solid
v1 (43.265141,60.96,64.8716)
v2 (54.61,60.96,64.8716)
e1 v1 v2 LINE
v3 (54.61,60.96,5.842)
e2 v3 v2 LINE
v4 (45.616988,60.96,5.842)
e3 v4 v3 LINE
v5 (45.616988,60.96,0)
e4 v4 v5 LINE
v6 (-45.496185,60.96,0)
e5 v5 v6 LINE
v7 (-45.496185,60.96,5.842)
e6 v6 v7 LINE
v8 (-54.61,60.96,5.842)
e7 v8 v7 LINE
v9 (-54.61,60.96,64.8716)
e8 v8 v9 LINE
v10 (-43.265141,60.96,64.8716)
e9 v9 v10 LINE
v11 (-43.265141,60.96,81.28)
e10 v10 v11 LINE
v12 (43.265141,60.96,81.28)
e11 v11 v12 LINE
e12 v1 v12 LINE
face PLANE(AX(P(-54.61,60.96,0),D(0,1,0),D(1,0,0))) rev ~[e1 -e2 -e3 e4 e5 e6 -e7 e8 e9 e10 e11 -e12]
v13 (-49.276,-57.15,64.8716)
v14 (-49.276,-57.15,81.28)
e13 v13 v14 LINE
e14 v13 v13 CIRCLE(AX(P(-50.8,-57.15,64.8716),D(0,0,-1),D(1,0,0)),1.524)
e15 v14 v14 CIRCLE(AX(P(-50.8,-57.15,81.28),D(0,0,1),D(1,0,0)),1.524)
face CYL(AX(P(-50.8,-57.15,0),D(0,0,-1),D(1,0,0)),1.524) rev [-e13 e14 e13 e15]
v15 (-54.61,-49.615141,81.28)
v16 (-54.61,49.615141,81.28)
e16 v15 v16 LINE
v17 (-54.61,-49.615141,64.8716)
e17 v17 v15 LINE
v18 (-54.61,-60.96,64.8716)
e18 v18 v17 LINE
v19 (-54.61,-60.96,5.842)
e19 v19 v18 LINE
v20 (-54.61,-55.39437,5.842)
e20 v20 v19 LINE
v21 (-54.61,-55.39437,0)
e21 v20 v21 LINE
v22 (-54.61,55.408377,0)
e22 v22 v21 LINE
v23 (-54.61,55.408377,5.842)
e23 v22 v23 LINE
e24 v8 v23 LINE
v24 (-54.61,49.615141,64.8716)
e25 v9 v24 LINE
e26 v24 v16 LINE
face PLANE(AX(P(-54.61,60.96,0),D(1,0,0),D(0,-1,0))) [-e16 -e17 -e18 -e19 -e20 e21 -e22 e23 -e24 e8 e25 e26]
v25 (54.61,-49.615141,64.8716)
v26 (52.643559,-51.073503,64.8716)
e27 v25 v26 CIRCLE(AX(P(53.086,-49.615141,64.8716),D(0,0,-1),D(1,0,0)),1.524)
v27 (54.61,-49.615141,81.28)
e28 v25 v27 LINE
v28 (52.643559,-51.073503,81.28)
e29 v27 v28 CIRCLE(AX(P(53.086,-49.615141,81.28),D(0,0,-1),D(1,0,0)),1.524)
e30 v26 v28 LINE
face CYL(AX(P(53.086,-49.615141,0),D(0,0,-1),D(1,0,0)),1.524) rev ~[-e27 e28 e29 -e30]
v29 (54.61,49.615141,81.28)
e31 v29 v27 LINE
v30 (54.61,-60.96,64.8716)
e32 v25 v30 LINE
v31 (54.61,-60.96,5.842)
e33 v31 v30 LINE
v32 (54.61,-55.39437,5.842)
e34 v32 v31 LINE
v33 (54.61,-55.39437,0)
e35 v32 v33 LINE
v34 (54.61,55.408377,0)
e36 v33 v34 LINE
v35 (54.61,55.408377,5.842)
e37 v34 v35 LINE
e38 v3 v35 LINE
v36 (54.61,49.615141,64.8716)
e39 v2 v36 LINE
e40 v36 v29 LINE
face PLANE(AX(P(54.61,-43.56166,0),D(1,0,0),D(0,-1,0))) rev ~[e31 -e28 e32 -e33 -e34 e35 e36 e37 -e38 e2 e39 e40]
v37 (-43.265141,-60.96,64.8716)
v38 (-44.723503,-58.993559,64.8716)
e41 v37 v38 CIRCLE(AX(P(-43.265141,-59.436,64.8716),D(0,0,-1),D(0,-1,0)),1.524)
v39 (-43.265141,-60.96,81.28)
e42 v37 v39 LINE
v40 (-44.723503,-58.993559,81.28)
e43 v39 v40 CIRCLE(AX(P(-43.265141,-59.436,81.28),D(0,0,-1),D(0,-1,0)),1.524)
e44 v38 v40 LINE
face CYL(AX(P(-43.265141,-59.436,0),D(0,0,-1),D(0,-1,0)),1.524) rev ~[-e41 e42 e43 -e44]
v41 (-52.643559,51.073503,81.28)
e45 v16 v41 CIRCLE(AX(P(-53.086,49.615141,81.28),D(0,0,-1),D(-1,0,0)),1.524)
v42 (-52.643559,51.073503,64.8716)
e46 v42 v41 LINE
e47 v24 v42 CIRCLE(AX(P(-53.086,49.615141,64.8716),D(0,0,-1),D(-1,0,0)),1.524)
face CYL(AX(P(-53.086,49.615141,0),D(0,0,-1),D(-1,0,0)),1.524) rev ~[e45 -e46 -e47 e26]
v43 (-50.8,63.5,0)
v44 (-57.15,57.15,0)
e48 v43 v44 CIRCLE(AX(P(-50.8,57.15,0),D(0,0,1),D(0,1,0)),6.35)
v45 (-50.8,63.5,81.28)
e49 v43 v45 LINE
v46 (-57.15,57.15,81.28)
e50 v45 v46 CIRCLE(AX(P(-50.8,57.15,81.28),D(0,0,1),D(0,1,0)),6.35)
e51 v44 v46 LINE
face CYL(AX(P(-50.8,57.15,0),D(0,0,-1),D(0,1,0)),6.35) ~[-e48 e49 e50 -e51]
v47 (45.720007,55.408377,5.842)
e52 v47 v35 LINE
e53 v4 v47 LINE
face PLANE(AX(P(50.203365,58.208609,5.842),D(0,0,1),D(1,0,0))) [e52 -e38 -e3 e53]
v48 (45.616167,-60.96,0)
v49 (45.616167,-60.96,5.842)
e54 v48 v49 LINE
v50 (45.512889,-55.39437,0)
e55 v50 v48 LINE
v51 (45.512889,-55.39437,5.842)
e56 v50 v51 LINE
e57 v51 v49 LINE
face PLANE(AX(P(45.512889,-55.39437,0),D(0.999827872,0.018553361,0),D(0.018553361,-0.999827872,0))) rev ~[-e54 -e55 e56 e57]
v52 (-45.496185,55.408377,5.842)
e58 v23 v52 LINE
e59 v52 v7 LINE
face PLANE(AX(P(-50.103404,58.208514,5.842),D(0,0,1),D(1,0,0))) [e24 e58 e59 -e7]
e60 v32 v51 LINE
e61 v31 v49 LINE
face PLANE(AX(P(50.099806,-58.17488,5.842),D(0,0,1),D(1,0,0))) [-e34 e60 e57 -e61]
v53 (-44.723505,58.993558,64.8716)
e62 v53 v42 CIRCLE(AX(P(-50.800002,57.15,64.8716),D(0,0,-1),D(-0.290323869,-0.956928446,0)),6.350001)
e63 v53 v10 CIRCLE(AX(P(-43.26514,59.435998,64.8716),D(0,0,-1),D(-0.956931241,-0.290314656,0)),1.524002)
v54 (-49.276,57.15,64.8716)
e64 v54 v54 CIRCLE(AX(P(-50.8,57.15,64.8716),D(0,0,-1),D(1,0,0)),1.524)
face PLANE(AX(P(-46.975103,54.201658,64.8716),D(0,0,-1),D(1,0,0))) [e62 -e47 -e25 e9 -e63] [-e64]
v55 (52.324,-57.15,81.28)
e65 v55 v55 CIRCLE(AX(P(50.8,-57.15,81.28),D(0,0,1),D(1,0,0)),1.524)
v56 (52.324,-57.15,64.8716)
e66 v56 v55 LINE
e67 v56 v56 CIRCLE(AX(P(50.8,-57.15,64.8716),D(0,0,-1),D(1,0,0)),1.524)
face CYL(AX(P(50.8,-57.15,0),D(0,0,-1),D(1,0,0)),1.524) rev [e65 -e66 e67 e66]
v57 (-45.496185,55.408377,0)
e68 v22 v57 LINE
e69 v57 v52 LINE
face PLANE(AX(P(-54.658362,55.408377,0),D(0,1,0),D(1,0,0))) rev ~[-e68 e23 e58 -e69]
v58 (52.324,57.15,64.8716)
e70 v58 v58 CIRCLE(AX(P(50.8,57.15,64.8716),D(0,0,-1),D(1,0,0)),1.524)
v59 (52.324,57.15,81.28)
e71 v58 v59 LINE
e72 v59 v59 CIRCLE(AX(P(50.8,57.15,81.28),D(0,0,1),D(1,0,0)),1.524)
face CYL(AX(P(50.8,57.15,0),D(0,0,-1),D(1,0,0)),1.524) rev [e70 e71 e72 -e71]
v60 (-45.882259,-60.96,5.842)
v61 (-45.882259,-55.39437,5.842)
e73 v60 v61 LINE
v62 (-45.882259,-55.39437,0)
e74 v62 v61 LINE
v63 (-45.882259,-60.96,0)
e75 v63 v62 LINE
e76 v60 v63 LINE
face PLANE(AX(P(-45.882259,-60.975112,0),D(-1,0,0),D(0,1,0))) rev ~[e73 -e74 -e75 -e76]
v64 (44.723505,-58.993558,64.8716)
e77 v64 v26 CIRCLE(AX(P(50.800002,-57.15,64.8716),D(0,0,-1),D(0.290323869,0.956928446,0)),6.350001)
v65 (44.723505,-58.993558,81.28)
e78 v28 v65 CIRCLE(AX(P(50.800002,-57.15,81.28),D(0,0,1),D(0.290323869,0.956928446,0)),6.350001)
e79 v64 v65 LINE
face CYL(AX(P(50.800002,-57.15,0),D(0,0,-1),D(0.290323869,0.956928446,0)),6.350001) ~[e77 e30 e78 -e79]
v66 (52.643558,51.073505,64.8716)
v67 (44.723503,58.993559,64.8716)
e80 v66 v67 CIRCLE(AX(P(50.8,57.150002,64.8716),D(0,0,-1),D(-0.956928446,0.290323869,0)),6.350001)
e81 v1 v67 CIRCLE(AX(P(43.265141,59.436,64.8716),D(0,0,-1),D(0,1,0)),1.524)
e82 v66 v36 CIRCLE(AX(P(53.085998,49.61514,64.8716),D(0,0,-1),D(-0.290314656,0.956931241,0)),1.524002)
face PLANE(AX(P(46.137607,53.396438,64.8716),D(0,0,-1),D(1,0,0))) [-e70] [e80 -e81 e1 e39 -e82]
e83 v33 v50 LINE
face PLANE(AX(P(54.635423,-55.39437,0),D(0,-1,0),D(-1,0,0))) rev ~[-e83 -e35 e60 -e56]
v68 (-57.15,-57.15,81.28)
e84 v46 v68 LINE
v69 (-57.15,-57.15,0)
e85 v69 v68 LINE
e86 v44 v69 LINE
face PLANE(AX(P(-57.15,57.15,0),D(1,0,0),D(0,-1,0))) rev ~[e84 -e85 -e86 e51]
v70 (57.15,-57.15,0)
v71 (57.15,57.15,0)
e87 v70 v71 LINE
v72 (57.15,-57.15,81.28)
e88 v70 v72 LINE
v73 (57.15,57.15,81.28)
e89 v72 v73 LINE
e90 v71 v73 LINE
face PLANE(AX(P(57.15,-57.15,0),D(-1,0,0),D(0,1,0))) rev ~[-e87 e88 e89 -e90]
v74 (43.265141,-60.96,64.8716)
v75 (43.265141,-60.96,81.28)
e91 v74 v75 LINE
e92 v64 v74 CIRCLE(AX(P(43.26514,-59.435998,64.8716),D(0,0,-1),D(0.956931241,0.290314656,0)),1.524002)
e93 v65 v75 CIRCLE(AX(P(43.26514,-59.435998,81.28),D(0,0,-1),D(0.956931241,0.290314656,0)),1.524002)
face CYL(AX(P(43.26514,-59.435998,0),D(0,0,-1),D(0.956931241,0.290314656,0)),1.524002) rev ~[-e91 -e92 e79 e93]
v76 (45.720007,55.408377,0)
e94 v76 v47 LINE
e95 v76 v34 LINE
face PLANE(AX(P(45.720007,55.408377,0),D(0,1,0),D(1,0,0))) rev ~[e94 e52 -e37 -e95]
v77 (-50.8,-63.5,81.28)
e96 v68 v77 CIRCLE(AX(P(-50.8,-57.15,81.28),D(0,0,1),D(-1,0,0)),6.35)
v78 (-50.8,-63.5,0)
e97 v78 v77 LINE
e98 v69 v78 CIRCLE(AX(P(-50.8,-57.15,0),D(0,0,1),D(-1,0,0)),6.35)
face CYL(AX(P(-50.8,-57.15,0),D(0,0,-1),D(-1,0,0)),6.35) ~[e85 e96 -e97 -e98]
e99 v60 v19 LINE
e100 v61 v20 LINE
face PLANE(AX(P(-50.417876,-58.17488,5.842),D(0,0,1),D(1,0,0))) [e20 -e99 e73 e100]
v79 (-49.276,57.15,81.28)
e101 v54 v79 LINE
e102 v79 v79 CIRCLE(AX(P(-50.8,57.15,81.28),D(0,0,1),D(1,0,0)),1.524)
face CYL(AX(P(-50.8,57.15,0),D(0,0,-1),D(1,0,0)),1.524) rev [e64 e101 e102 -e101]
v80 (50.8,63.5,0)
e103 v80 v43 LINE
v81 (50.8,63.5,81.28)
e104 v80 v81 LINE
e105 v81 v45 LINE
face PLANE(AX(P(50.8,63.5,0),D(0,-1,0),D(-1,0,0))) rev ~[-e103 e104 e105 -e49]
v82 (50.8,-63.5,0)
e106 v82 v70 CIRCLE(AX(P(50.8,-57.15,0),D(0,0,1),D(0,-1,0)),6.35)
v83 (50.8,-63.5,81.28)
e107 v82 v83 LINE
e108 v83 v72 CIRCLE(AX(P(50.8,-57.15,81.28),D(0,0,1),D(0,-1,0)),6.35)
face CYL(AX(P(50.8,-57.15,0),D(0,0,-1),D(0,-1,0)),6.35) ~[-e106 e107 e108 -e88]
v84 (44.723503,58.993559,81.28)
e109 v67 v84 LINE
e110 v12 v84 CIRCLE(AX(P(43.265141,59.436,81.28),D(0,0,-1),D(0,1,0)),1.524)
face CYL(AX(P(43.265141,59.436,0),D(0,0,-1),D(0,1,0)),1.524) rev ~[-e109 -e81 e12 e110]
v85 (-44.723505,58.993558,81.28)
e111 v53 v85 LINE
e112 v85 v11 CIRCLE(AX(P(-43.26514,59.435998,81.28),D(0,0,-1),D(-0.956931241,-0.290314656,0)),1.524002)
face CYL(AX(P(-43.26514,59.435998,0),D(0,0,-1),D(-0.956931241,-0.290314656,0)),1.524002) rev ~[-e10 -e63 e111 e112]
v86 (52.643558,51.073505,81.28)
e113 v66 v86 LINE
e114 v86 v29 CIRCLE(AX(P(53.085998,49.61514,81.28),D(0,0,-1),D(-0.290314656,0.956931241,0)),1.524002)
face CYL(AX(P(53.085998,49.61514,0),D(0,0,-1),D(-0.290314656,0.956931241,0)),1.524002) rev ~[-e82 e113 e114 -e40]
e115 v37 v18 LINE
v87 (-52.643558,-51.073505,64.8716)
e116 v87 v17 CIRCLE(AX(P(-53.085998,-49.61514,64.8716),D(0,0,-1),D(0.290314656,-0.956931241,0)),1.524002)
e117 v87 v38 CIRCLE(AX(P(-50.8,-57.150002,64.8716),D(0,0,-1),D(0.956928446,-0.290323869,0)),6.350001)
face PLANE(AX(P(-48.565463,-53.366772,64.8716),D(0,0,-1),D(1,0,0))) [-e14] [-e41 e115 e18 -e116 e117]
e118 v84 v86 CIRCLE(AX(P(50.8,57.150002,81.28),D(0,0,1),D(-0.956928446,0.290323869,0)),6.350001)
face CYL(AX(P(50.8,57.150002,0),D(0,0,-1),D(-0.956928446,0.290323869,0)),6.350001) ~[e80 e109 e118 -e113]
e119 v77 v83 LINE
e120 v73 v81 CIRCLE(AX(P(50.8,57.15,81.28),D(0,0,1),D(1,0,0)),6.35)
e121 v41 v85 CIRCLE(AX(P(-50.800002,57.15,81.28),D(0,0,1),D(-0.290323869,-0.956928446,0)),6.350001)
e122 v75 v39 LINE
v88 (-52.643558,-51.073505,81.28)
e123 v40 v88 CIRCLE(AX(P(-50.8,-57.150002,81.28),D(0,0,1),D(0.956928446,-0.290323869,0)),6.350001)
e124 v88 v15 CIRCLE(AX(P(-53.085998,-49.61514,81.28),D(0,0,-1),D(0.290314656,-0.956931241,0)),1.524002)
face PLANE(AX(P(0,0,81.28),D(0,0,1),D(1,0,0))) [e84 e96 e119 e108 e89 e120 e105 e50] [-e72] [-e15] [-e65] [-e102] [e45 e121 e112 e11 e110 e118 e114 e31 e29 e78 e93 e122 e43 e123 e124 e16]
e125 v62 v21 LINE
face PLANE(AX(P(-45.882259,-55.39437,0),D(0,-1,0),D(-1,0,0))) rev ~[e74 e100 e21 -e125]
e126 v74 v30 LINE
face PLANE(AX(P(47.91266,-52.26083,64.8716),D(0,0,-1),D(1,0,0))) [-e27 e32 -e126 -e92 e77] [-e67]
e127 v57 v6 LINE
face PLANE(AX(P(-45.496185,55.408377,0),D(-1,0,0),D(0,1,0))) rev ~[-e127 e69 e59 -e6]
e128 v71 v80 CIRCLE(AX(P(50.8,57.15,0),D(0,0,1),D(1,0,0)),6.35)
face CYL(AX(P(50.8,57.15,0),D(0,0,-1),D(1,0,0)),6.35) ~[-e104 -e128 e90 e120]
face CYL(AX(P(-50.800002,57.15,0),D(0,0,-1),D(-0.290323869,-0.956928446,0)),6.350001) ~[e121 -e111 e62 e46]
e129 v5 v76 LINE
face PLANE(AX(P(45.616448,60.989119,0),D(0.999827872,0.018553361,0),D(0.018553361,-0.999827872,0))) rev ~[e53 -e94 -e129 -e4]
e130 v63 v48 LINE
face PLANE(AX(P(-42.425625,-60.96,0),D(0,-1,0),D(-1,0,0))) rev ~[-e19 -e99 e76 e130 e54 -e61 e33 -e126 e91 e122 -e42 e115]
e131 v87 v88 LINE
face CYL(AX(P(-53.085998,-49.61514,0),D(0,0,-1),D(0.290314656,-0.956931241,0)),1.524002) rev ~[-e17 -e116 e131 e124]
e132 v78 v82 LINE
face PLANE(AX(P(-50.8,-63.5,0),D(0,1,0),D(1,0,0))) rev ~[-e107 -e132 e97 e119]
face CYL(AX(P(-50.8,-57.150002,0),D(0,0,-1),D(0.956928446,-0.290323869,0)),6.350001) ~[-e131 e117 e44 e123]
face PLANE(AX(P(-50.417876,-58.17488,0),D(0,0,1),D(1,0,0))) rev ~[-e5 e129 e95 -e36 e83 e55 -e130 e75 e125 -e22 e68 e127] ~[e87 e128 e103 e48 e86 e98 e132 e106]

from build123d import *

# Parameters (mm, degrees)
F0_R     = 1.524
F1_DEPTH = 81.28
F2_W     = 13.3946808136
F2_H     = 17.3983402467
F2_W_2   = 15.2697945094
F2_H_2   = 13.5166846132
F3_DEPTH = 64.8716
F5_DEPTH = 5.842


# Not quite as in the source:
# - ends of sketch curves that miss each other by under 0.0002 mm in the source are joined


with BuildPart() as f1:
    # F0 (on Top) → F1 (new body)
    with BuildSketch(Plane.XY):
        with BuildLine():
            Line((57.15, -57.15), (57.15, 57.15))
            ThreePointArc((57.15, 57.15), (55.2901280605, 61.6401280605), (50.8, 63.5))
            Line((50.8, 63.5), (-50.8, 63.5))
            ThreePointArc((-50.8, 63.5), (-55.2901280605, 61.6401280605), (-57.15, 57.15))
            Line((-57.15, 57.15), (-57.15, -57.15))
            ThreePointArc((-57.15, -57.15), (-55.2901280605, -61.6401280605), (-50.8, -63.5))
            Line((-50.8, -63.5), (50.8, -63.5))
            ThreePointArc((50.8, -63.5), (55.2901280605, -61.6401280605), (57.15, -57.15))
        make_face()
        with Locations((-50.8, -57.15)):
            Circle(F0_R, mode=Mode.SUBTRACT)
        with Locations((50.8, -57.15)):
            Circle(F0_R, mode=Mode.SUBTRACT)
        with Locations((-50.8, 57.15)):
            Circle(F0_R, mode=Mode.SUBTRACT)
        with BuildLine():
            Line((-43.2651408, 60.96), (43.2651408, 60.96))
            ThreePointArc((43.2651408, 60.96), (44.4892438959, 60.34382576), (44.7235034291, 58.993558544))
            ThreePointArc((44.7235034291, 58.993558544), (46.3098719395, 52.6598719395), (52.643558117, 51.0735048367))
            ThreePointArc((52.643558117, 51.0735048367), (53.99382576, 50.8392438959), (54.61, 49.6151408))
            Line((54.61, 49.6151408), (54.61, -49.6151408))
            ThreePointArc((54.61, -49.6151408), (53.99382576, -50.8392438959), (52.643558544, -51.0735034291))
            ThreePointArc((52.643558544, -51.0735034291), (46.3098719395, -52.6598719395), (44.7235048367, -58.993558117))
            ThreePointArc((44.7235048367, -58.993558117), (44.4892438959, -60.34382576), (43.2651408, -60.96))
            Line((43.2651408, -60.96), (-43.2651408, -60.96))
            ThreePointArc((-43.2651408, -60.96), (-44.4892438959, -60.34382576), (-44.7235034291, -58.993558544))
            ThreePointArc((-44.7235034291, -58.993558544), (-46.3098719395, -52.6598719395), (-52.643558117, -51.0735048367))
            ThreePointArc((-52.643558117, -51.0735048367), (-53.99382576, -50.8392438959), (-54.61, -49.6151408))
            Line((-54.61, -49.6151408), (-54.61, 49.6151408))
            ThreePointArc((-54.61, 49.6151408), (-53.99382576, 50.8392438959), (-52.643558544, 51.0735034291))
            ThreePointArc((-52.643558544, 51.0735034291), (-46.3098719395, 52.6598719395), (-44.7235048367, 58.993558117))
            ThreePointArc((-44.7235048367, 58.993558117), (-44.4892438959, 60.34382576), (-43.2651408, 60.96))
        make_face(mode=Mode.SUBTRACT)
        with Locations((50.8, 57.15)):
            Circle(F0_R, mode=Mode.SUBTRACT)
    extrude(amount=F1_DEPTH)

    # F2 (on face) → F3 (cut)
    with BuildSketch(Plane(origin=(0, 0, 0), x_dir=(1, 0, 0), z_dir=(0, 0, -1))):
        with Locations((47.9126595932, 52.2608298767)):
            Rectangle(F2_W, F2_H)
        Polygon((-54.61, 60.96), (-54.61, 45.5632209778), (-42.4256250262, 45.9913872182), (-42.4256250262, 60.96), align=None)
        Polygon((37.4062317246, -45.9566726098), (37.9334576428, -60.96), (54.61, -60.96), (54.61, -45.9566726098), align=None)
        with Locations((-46.9751027453, -54.2016576934)):
            Rectangle(F2_W_2, F2_H_2)
    extrude(amount=-F3_DEPTH, mode=Mode.SUBTRACT)

    # F4 (on Top) → F5 (join)
    with BuildSketch(Plane.XY):
        Polygon((-45.8822585642, -55.3943701088), (-55.0047931408, -55.3943701088), (-54.9012337958, -60.975112021), (-45.8822585642, -60.975112021), align=None)
        Polygon((-45.4961853886, 60.9891191125), (-54.7619216034, 60.9891191125), (-54.6583622584, 55.4083772004), (-45.4961853886, 55.4083772004), align=None)
        Polygon((54.7389825022, 60.9891191125), (45.6164479256, 60.9891191125), (45.7200072706, 55.4083772004), (54.7389825022, 55.4083772004), align=None)
        Polygon((54.6354231571, -55.3943701088), (45.5128885806, -55.3943701088), (45.6164479256, -60.975112021), (54.6354231571, -60.975112021), align=None)
    extrude(amount=F5_DEPTH)


solid = f1.part
